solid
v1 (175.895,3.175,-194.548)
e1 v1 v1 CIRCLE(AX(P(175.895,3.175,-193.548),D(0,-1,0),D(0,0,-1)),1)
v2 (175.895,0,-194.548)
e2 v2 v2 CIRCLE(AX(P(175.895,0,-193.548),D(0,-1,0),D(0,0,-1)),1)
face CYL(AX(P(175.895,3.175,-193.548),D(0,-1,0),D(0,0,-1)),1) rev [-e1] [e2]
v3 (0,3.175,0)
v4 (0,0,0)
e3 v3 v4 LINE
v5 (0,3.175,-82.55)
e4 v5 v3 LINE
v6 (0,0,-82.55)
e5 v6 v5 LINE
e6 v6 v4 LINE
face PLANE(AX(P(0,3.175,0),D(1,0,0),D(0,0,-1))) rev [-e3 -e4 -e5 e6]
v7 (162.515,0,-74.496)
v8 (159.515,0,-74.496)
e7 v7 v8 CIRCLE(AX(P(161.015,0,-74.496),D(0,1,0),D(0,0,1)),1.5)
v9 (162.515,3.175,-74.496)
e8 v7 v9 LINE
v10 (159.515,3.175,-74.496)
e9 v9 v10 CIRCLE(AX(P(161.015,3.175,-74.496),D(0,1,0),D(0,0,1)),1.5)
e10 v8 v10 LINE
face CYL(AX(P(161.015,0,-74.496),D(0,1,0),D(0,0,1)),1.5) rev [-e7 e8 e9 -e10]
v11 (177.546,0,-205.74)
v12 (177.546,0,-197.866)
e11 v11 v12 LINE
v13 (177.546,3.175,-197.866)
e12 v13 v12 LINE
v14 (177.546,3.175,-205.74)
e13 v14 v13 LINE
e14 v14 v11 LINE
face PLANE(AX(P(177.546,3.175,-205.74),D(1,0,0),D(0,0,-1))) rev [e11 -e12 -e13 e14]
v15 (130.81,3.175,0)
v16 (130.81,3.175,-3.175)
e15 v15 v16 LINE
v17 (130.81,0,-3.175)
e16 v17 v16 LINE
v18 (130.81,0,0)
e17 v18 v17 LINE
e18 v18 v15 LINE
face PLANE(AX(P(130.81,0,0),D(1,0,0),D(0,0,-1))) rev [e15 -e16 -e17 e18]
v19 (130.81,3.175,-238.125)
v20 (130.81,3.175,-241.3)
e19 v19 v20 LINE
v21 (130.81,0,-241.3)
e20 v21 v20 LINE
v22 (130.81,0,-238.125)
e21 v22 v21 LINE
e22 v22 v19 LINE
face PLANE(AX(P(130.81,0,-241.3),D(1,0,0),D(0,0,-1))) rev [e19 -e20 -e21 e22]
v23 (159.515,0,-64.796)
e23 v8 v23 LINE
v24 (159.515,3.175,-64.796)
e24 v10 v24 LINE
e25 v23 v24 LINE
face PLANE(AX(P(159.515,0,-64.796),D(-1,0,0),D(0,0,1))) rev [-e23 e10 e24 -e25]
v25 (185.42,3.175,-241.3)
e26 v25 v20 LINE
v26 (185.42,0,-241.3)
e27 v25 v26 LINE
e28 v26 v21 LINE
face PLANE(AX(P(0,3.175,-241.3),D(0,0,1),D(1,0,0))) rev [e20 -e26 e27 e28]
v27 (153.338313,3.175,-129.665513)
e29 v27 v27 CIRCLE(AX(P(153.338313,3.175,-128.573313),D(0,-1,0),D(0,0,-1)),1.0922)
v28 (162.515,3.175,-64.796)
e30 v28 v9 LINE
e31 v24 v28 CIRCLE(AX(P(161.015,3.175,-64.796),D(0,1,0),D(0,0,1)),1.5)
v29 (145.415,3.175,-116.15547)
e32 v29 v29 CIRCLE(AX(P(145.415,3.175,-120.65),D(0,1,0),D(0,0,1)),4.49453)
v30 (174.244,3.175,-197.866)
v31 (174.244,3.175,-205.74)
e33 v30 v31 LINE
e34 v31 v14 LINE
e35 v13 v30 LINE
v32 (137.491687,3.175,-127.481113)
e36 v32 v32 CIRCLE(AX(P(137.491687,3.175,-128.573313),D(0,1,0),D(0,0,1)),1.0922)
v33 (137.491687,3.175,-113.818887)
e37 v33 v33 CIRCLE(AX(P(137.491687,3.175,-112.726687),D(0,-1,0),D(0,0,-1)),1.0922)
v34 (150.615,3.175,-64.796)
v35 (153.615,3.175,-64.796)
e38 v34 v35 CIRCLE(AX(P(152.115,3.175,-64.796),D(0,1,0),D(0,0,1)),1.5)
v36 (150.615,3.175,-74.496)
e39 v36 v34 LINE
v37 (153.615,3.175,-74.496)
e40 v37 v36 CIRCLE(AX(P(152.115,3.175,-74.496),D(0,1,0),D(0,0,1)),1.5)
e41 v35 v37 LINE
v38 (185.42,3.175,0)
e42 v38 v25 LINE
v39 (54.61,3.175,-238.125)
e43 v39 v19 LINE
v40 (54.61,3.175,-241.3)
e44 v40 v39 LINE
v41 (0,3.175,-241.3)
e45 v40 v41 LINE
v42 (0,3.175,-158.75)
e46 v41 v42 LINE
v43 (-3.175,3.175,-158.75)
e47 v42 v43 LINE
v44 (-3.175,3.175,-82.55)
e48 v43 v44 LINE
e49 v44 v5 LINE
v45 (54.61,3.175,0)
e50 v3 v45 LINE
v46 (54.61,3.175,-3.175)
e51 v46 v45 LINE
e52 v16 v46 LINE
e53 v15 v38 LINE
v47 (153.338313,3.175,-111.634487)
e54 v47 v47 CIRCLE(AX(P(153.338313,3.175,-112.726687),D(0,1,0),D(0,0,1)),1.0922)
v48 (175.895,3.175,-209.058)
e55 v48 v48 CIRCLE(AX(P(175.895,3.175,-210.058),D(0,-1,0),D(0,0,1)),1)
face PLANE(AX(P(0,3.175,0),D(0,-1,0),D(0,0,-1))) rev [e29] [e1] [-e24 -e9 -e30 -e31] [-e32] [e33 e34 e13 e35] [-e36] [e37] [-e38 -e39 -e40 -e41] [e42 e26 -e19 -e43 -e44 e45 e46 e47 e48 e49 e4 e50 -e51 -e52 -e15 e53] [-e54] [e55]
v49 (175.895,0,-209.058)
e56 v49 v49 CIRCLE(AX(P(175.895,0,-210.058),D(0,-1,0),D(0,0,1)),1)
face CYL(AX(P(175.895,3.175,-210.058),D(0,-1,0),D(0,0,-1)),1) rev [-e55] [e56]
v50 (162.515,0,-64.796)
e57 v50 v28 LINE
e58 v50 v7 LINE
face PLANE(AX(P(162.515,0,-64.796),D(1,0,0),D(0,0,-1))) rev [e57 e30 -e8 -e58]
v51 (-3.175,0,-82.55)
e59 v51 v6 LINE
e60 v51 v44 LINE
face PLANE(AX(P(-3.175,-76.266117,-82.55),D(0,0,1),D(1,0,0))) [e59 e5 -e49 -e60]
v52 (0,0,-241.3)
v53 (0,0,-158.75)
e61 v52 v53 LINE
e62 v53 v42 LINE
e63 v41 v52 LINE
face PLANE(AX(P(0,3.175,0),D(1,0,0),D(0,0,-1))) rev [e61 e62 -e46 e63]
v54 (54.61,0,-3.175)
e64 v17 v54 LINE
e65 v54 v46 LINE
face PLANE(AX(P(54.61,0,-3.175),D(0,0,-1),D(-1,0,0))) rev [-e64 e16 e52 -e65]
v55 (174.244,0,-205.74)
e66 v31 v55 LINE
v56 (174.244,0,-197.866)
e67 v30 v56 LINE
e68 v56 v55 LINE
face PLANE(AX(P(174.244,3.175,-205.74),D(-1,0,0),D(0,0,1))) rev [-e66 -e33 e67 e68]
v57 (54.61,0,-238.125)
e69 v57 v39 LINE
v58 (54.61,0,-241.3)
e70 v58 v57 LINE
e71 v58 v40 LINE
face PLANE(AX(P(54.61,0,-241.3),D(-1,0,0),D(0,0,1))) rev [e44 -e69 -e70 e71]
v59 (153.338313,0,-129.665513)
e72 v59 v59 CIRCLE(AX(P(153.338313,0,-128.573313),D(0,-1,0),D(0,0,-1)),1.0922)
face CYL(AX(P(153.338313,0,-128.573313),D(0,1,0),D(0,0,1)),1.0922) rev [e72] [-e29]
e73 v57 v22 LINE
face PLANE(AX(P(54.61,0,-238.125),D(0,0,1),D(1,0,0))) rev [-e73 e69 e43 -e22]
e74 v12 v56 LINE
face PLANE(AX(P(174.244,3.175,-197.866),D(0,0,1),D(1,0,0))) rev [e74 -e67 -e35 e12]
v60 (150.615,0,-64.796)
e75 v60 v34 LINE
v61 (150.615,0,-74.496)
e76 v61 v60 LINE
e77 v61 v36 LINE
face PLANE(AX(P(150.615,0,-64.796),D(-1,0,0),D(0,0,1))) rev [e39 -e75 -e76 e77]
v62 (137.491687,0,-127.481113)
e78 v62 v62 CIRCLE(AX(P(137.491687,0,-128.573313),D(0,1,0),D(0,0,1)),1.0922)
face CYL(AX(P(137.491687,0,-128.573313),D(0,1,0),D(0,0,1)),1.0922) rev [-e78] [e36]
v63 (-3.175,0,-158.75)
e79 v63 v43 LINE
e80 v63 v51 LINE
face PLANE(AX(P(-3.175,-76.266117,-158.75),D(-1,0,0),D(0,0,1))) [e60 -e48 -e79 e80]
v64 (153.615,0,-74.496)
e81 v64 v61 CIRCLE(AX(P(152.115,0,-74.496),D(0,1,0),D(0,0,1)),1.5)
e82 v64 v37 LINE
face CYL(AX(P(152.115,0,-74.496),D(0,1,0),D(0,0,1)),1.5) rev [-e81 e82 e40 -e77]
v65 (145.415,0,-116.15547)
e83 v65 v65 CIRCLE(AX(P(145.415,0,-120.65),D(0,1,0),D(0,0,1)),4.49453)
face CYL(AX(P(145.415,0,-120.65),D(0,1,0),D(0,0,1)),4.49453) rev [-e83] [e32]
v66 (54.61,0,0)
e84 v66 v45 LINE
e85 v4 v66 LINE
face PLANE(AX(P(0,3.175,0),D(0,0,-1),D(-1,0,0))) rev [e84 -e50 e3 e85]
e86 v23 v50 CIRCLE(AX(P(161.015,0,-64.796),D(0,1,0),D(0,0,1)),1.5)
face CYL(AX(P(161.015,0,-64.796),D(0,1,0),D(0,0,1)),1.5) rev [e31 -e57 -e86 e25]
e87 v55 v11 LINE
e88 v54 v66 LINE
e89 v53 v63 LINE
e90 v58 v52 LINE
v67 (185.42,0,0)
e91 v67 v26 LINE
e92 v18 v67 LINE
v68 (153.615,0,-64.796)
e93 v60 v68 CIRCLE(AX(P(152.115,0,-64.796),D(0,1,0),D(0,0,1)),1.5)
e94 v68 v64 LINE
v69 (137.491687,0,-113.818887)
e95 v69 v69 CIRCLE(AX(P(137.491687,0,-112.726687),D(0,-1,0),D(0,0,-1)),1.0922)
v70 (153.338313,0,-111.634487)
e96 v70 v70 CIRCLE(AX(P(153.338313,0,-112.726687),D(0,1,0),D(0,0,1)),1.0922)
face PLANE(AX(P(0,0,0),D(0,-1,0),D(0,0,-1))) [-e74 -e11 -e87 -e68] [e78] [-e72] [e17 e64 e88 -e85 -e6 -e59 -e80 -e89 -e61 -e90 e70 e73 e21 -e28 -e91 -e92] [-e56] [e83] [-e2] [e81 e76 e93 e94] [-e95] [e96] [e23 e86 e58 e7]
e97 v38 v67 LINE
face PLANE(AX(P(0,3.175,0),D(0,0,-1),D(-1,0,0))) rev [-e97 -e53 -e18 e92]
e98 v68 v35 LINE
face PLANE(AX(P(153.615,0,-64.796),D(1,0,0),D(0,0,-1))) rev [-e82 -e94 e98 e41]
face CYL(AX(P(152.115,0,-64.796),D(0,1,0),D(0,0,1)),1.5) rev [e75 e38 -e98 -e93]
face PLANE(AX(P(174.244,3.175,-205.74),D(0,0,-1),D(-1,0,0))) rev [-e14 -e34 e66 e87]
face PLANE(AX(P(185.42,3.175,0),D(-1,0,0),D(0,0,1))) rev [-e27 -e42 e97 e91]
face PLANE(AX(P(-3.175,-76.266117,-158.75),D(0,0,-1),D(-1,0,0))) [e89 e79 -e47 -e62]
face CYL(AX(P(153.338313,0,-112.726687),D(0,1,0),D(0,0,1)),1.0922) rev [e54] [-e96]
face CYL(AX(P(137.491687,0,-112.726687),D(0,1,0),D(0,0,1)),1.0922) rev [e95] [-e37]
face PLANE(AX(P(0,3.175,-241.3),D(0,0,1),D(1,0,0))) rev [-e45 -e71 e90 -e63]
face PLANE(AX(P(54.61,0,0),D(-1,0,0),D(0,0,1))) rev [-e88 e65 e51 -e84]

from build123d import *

# Parameters (mm, degrees)
SKETCH1_W                = 185.42
SKETCH1_H                = 241.3
BOSS_EXTRUDE1_DEPTH      = 3.175
CUT_EXTRUDE1_OUTLINE_R   = 4.49453
CUT_EXTRUDE1_OUTLINE_R_2 = 1.0922
CUT_EXTRUDE1_DEPTH       = 3.175
CUT_EXTRUDE2_DEPTH       = 305.329339737
SKETCH8_R                = 1
SKETCH8_W                = 3.302
SKETCH8_H                = 7.874
CUT_EXTRUDE4_DEPTH       = 305.329339737
SKETCH9_W                = 76.2
SKETCH9_H                = 3.175
CUT_EXTRUDE5_DEPTH       = 305.329339737
SKETCH10_W               = 3.175
SKETCH10_H               = 76.2
BOSS_EXTRUDE4_DEPTH      = 3.175


# Read off the part's stored shape, not the designer's step: Cut-Extrude1
with BuildPart() as part:
    # Sketch1 → Boss-Extrude1 (new body)
    with BuildSketch(Plane(origin=(0, 0, 0), x_dir=(1, 0, 0), z_dir=(0, 1, 0))):
        with Locations((92.71, 120.65)):
            Rectangle(SKETCH1_W, SKETCH1_H)
    extrude(amount=BOSS_EXTRUDE1_DEPTH)

    # Cut-Extrude1 outline → Cut-Extrude1 (cut)
    with BuildSketch(Plane(origin=(0, 0, 0), x_dir=(1, 0, 0), z_dir=(0, 1, 0))):
        with Locations((145.415, 120.65)):
            Circle(CUT_EXTRUDE1_OUTLINE_R)
        with Locations((153.338312588, 128.573312588)):
            Circle(CUT_EXTRUDE1_OUTLINE_R_2)
        with Locations((137.491687412, 128.573312588)):
            Circle(CUT_EXTRUDE1_OUTLINE_R_2)
        with Locations((137.491687412, 112.726687412)):
            Circle(CUT_EXTRUDE1_OUTLINE_R_2)
        with Locations((153.338312588, 112.726687412)):
            Circle(CUT_EXTRUDE1_OUTLINE_R_2)
    extrude(amount=CUT_EXTRUDE1_DEPTH, mode=Mode.SUBTRACT)

    # Sketch6 → Cut-Extrude2 (cut, through all)
    with BuildSketch(Plane(origin=(0, 3.175, 0), x_dir=(1, 0, 0), z_dir=(0, 1, 0))):
        with BuildLine():
            Line((150.615, 64.796000096), (150.615, 74.496000096))
            ThreePointArc((150.615, 74.496000096), (152.115, 75.996000096), (153.615, 74.496000096))
            Line((153.615, 74.496000096), (153.615, 64.796000096))
            ThreePointArc((153.615, 64.796000096), (152.115, 63.296000096), (150.615, 64.796000096))
        make_face()
        with BuildLine():
            Line((159.515, 64.796000096), (159.515, 74.496000096))
            ThreePointArc((159.515, 74.496000096), (161.015, 75.996000096), (162.515, 74.496000096))
            Line((162.515, 74.496000096), (162.515, 64.796000096))
            ThreePointArc((162.515, 64.796000096), (161.015, 63.296000096), (159.515, 64.796000096))
        make_face()
    extrude(amount=-CUT_EXTRUDE2_DEPTH, mode=Mode.SUBTRACT)

    # Sketch8 → Cut-Extrude4 (cut, through all)
    with BuildSketch(Plane.XZ):
        with Locations(Location((175.895, -193.548, 0), (0, 0, 270))):
            Circle(SKETCH8_R)
        with Locations(Location((175.895, -210.058, 0), (0, 0, 90))):
            Circle(SKETCH8_R)
        with Locations((175.895, -201.803)):
            Rectangle(SKETCH8_W, SKETCH8_H)
    extrude(amount=-CUT_EXTRUDE4_DEPTH, mode=Mode.SUBTRACT)

    # Sketch9 → Cut-Extrude5 (cut, through all)
    with BuildSketch(Plane(origin=(0, 3.175, 0), x_dir=(1, 0, 0), z_dir=(0, 1, 0))):
        with Locations((92.71, 239.7125)):
            Rectangle(SKETCH9_W, SKETCH9_H)
        with Locations((92.71, 1.5875)):
            Rectangle(SKETCH9_W, SKETCH9_H)
    extrude(amount=-CUT_EXTRUDE5_DEPTH, mode=Mode.SUBTRACT)

    # Sketch10 → Boss-Extrude4 (add)
    with BuildSketch(Plane(origin=(0, 3.175, 0), x_dir=(1, 0, 0), z_dir=(0, 1, 0))):
        with Locations((-1.5875, 120.65)):
            Rectangle(SKETCH10_W, SKETCH10_H)
    extrude(amount=-BOSS_EXTRUDE4_DEPTH)


solid = part.part
